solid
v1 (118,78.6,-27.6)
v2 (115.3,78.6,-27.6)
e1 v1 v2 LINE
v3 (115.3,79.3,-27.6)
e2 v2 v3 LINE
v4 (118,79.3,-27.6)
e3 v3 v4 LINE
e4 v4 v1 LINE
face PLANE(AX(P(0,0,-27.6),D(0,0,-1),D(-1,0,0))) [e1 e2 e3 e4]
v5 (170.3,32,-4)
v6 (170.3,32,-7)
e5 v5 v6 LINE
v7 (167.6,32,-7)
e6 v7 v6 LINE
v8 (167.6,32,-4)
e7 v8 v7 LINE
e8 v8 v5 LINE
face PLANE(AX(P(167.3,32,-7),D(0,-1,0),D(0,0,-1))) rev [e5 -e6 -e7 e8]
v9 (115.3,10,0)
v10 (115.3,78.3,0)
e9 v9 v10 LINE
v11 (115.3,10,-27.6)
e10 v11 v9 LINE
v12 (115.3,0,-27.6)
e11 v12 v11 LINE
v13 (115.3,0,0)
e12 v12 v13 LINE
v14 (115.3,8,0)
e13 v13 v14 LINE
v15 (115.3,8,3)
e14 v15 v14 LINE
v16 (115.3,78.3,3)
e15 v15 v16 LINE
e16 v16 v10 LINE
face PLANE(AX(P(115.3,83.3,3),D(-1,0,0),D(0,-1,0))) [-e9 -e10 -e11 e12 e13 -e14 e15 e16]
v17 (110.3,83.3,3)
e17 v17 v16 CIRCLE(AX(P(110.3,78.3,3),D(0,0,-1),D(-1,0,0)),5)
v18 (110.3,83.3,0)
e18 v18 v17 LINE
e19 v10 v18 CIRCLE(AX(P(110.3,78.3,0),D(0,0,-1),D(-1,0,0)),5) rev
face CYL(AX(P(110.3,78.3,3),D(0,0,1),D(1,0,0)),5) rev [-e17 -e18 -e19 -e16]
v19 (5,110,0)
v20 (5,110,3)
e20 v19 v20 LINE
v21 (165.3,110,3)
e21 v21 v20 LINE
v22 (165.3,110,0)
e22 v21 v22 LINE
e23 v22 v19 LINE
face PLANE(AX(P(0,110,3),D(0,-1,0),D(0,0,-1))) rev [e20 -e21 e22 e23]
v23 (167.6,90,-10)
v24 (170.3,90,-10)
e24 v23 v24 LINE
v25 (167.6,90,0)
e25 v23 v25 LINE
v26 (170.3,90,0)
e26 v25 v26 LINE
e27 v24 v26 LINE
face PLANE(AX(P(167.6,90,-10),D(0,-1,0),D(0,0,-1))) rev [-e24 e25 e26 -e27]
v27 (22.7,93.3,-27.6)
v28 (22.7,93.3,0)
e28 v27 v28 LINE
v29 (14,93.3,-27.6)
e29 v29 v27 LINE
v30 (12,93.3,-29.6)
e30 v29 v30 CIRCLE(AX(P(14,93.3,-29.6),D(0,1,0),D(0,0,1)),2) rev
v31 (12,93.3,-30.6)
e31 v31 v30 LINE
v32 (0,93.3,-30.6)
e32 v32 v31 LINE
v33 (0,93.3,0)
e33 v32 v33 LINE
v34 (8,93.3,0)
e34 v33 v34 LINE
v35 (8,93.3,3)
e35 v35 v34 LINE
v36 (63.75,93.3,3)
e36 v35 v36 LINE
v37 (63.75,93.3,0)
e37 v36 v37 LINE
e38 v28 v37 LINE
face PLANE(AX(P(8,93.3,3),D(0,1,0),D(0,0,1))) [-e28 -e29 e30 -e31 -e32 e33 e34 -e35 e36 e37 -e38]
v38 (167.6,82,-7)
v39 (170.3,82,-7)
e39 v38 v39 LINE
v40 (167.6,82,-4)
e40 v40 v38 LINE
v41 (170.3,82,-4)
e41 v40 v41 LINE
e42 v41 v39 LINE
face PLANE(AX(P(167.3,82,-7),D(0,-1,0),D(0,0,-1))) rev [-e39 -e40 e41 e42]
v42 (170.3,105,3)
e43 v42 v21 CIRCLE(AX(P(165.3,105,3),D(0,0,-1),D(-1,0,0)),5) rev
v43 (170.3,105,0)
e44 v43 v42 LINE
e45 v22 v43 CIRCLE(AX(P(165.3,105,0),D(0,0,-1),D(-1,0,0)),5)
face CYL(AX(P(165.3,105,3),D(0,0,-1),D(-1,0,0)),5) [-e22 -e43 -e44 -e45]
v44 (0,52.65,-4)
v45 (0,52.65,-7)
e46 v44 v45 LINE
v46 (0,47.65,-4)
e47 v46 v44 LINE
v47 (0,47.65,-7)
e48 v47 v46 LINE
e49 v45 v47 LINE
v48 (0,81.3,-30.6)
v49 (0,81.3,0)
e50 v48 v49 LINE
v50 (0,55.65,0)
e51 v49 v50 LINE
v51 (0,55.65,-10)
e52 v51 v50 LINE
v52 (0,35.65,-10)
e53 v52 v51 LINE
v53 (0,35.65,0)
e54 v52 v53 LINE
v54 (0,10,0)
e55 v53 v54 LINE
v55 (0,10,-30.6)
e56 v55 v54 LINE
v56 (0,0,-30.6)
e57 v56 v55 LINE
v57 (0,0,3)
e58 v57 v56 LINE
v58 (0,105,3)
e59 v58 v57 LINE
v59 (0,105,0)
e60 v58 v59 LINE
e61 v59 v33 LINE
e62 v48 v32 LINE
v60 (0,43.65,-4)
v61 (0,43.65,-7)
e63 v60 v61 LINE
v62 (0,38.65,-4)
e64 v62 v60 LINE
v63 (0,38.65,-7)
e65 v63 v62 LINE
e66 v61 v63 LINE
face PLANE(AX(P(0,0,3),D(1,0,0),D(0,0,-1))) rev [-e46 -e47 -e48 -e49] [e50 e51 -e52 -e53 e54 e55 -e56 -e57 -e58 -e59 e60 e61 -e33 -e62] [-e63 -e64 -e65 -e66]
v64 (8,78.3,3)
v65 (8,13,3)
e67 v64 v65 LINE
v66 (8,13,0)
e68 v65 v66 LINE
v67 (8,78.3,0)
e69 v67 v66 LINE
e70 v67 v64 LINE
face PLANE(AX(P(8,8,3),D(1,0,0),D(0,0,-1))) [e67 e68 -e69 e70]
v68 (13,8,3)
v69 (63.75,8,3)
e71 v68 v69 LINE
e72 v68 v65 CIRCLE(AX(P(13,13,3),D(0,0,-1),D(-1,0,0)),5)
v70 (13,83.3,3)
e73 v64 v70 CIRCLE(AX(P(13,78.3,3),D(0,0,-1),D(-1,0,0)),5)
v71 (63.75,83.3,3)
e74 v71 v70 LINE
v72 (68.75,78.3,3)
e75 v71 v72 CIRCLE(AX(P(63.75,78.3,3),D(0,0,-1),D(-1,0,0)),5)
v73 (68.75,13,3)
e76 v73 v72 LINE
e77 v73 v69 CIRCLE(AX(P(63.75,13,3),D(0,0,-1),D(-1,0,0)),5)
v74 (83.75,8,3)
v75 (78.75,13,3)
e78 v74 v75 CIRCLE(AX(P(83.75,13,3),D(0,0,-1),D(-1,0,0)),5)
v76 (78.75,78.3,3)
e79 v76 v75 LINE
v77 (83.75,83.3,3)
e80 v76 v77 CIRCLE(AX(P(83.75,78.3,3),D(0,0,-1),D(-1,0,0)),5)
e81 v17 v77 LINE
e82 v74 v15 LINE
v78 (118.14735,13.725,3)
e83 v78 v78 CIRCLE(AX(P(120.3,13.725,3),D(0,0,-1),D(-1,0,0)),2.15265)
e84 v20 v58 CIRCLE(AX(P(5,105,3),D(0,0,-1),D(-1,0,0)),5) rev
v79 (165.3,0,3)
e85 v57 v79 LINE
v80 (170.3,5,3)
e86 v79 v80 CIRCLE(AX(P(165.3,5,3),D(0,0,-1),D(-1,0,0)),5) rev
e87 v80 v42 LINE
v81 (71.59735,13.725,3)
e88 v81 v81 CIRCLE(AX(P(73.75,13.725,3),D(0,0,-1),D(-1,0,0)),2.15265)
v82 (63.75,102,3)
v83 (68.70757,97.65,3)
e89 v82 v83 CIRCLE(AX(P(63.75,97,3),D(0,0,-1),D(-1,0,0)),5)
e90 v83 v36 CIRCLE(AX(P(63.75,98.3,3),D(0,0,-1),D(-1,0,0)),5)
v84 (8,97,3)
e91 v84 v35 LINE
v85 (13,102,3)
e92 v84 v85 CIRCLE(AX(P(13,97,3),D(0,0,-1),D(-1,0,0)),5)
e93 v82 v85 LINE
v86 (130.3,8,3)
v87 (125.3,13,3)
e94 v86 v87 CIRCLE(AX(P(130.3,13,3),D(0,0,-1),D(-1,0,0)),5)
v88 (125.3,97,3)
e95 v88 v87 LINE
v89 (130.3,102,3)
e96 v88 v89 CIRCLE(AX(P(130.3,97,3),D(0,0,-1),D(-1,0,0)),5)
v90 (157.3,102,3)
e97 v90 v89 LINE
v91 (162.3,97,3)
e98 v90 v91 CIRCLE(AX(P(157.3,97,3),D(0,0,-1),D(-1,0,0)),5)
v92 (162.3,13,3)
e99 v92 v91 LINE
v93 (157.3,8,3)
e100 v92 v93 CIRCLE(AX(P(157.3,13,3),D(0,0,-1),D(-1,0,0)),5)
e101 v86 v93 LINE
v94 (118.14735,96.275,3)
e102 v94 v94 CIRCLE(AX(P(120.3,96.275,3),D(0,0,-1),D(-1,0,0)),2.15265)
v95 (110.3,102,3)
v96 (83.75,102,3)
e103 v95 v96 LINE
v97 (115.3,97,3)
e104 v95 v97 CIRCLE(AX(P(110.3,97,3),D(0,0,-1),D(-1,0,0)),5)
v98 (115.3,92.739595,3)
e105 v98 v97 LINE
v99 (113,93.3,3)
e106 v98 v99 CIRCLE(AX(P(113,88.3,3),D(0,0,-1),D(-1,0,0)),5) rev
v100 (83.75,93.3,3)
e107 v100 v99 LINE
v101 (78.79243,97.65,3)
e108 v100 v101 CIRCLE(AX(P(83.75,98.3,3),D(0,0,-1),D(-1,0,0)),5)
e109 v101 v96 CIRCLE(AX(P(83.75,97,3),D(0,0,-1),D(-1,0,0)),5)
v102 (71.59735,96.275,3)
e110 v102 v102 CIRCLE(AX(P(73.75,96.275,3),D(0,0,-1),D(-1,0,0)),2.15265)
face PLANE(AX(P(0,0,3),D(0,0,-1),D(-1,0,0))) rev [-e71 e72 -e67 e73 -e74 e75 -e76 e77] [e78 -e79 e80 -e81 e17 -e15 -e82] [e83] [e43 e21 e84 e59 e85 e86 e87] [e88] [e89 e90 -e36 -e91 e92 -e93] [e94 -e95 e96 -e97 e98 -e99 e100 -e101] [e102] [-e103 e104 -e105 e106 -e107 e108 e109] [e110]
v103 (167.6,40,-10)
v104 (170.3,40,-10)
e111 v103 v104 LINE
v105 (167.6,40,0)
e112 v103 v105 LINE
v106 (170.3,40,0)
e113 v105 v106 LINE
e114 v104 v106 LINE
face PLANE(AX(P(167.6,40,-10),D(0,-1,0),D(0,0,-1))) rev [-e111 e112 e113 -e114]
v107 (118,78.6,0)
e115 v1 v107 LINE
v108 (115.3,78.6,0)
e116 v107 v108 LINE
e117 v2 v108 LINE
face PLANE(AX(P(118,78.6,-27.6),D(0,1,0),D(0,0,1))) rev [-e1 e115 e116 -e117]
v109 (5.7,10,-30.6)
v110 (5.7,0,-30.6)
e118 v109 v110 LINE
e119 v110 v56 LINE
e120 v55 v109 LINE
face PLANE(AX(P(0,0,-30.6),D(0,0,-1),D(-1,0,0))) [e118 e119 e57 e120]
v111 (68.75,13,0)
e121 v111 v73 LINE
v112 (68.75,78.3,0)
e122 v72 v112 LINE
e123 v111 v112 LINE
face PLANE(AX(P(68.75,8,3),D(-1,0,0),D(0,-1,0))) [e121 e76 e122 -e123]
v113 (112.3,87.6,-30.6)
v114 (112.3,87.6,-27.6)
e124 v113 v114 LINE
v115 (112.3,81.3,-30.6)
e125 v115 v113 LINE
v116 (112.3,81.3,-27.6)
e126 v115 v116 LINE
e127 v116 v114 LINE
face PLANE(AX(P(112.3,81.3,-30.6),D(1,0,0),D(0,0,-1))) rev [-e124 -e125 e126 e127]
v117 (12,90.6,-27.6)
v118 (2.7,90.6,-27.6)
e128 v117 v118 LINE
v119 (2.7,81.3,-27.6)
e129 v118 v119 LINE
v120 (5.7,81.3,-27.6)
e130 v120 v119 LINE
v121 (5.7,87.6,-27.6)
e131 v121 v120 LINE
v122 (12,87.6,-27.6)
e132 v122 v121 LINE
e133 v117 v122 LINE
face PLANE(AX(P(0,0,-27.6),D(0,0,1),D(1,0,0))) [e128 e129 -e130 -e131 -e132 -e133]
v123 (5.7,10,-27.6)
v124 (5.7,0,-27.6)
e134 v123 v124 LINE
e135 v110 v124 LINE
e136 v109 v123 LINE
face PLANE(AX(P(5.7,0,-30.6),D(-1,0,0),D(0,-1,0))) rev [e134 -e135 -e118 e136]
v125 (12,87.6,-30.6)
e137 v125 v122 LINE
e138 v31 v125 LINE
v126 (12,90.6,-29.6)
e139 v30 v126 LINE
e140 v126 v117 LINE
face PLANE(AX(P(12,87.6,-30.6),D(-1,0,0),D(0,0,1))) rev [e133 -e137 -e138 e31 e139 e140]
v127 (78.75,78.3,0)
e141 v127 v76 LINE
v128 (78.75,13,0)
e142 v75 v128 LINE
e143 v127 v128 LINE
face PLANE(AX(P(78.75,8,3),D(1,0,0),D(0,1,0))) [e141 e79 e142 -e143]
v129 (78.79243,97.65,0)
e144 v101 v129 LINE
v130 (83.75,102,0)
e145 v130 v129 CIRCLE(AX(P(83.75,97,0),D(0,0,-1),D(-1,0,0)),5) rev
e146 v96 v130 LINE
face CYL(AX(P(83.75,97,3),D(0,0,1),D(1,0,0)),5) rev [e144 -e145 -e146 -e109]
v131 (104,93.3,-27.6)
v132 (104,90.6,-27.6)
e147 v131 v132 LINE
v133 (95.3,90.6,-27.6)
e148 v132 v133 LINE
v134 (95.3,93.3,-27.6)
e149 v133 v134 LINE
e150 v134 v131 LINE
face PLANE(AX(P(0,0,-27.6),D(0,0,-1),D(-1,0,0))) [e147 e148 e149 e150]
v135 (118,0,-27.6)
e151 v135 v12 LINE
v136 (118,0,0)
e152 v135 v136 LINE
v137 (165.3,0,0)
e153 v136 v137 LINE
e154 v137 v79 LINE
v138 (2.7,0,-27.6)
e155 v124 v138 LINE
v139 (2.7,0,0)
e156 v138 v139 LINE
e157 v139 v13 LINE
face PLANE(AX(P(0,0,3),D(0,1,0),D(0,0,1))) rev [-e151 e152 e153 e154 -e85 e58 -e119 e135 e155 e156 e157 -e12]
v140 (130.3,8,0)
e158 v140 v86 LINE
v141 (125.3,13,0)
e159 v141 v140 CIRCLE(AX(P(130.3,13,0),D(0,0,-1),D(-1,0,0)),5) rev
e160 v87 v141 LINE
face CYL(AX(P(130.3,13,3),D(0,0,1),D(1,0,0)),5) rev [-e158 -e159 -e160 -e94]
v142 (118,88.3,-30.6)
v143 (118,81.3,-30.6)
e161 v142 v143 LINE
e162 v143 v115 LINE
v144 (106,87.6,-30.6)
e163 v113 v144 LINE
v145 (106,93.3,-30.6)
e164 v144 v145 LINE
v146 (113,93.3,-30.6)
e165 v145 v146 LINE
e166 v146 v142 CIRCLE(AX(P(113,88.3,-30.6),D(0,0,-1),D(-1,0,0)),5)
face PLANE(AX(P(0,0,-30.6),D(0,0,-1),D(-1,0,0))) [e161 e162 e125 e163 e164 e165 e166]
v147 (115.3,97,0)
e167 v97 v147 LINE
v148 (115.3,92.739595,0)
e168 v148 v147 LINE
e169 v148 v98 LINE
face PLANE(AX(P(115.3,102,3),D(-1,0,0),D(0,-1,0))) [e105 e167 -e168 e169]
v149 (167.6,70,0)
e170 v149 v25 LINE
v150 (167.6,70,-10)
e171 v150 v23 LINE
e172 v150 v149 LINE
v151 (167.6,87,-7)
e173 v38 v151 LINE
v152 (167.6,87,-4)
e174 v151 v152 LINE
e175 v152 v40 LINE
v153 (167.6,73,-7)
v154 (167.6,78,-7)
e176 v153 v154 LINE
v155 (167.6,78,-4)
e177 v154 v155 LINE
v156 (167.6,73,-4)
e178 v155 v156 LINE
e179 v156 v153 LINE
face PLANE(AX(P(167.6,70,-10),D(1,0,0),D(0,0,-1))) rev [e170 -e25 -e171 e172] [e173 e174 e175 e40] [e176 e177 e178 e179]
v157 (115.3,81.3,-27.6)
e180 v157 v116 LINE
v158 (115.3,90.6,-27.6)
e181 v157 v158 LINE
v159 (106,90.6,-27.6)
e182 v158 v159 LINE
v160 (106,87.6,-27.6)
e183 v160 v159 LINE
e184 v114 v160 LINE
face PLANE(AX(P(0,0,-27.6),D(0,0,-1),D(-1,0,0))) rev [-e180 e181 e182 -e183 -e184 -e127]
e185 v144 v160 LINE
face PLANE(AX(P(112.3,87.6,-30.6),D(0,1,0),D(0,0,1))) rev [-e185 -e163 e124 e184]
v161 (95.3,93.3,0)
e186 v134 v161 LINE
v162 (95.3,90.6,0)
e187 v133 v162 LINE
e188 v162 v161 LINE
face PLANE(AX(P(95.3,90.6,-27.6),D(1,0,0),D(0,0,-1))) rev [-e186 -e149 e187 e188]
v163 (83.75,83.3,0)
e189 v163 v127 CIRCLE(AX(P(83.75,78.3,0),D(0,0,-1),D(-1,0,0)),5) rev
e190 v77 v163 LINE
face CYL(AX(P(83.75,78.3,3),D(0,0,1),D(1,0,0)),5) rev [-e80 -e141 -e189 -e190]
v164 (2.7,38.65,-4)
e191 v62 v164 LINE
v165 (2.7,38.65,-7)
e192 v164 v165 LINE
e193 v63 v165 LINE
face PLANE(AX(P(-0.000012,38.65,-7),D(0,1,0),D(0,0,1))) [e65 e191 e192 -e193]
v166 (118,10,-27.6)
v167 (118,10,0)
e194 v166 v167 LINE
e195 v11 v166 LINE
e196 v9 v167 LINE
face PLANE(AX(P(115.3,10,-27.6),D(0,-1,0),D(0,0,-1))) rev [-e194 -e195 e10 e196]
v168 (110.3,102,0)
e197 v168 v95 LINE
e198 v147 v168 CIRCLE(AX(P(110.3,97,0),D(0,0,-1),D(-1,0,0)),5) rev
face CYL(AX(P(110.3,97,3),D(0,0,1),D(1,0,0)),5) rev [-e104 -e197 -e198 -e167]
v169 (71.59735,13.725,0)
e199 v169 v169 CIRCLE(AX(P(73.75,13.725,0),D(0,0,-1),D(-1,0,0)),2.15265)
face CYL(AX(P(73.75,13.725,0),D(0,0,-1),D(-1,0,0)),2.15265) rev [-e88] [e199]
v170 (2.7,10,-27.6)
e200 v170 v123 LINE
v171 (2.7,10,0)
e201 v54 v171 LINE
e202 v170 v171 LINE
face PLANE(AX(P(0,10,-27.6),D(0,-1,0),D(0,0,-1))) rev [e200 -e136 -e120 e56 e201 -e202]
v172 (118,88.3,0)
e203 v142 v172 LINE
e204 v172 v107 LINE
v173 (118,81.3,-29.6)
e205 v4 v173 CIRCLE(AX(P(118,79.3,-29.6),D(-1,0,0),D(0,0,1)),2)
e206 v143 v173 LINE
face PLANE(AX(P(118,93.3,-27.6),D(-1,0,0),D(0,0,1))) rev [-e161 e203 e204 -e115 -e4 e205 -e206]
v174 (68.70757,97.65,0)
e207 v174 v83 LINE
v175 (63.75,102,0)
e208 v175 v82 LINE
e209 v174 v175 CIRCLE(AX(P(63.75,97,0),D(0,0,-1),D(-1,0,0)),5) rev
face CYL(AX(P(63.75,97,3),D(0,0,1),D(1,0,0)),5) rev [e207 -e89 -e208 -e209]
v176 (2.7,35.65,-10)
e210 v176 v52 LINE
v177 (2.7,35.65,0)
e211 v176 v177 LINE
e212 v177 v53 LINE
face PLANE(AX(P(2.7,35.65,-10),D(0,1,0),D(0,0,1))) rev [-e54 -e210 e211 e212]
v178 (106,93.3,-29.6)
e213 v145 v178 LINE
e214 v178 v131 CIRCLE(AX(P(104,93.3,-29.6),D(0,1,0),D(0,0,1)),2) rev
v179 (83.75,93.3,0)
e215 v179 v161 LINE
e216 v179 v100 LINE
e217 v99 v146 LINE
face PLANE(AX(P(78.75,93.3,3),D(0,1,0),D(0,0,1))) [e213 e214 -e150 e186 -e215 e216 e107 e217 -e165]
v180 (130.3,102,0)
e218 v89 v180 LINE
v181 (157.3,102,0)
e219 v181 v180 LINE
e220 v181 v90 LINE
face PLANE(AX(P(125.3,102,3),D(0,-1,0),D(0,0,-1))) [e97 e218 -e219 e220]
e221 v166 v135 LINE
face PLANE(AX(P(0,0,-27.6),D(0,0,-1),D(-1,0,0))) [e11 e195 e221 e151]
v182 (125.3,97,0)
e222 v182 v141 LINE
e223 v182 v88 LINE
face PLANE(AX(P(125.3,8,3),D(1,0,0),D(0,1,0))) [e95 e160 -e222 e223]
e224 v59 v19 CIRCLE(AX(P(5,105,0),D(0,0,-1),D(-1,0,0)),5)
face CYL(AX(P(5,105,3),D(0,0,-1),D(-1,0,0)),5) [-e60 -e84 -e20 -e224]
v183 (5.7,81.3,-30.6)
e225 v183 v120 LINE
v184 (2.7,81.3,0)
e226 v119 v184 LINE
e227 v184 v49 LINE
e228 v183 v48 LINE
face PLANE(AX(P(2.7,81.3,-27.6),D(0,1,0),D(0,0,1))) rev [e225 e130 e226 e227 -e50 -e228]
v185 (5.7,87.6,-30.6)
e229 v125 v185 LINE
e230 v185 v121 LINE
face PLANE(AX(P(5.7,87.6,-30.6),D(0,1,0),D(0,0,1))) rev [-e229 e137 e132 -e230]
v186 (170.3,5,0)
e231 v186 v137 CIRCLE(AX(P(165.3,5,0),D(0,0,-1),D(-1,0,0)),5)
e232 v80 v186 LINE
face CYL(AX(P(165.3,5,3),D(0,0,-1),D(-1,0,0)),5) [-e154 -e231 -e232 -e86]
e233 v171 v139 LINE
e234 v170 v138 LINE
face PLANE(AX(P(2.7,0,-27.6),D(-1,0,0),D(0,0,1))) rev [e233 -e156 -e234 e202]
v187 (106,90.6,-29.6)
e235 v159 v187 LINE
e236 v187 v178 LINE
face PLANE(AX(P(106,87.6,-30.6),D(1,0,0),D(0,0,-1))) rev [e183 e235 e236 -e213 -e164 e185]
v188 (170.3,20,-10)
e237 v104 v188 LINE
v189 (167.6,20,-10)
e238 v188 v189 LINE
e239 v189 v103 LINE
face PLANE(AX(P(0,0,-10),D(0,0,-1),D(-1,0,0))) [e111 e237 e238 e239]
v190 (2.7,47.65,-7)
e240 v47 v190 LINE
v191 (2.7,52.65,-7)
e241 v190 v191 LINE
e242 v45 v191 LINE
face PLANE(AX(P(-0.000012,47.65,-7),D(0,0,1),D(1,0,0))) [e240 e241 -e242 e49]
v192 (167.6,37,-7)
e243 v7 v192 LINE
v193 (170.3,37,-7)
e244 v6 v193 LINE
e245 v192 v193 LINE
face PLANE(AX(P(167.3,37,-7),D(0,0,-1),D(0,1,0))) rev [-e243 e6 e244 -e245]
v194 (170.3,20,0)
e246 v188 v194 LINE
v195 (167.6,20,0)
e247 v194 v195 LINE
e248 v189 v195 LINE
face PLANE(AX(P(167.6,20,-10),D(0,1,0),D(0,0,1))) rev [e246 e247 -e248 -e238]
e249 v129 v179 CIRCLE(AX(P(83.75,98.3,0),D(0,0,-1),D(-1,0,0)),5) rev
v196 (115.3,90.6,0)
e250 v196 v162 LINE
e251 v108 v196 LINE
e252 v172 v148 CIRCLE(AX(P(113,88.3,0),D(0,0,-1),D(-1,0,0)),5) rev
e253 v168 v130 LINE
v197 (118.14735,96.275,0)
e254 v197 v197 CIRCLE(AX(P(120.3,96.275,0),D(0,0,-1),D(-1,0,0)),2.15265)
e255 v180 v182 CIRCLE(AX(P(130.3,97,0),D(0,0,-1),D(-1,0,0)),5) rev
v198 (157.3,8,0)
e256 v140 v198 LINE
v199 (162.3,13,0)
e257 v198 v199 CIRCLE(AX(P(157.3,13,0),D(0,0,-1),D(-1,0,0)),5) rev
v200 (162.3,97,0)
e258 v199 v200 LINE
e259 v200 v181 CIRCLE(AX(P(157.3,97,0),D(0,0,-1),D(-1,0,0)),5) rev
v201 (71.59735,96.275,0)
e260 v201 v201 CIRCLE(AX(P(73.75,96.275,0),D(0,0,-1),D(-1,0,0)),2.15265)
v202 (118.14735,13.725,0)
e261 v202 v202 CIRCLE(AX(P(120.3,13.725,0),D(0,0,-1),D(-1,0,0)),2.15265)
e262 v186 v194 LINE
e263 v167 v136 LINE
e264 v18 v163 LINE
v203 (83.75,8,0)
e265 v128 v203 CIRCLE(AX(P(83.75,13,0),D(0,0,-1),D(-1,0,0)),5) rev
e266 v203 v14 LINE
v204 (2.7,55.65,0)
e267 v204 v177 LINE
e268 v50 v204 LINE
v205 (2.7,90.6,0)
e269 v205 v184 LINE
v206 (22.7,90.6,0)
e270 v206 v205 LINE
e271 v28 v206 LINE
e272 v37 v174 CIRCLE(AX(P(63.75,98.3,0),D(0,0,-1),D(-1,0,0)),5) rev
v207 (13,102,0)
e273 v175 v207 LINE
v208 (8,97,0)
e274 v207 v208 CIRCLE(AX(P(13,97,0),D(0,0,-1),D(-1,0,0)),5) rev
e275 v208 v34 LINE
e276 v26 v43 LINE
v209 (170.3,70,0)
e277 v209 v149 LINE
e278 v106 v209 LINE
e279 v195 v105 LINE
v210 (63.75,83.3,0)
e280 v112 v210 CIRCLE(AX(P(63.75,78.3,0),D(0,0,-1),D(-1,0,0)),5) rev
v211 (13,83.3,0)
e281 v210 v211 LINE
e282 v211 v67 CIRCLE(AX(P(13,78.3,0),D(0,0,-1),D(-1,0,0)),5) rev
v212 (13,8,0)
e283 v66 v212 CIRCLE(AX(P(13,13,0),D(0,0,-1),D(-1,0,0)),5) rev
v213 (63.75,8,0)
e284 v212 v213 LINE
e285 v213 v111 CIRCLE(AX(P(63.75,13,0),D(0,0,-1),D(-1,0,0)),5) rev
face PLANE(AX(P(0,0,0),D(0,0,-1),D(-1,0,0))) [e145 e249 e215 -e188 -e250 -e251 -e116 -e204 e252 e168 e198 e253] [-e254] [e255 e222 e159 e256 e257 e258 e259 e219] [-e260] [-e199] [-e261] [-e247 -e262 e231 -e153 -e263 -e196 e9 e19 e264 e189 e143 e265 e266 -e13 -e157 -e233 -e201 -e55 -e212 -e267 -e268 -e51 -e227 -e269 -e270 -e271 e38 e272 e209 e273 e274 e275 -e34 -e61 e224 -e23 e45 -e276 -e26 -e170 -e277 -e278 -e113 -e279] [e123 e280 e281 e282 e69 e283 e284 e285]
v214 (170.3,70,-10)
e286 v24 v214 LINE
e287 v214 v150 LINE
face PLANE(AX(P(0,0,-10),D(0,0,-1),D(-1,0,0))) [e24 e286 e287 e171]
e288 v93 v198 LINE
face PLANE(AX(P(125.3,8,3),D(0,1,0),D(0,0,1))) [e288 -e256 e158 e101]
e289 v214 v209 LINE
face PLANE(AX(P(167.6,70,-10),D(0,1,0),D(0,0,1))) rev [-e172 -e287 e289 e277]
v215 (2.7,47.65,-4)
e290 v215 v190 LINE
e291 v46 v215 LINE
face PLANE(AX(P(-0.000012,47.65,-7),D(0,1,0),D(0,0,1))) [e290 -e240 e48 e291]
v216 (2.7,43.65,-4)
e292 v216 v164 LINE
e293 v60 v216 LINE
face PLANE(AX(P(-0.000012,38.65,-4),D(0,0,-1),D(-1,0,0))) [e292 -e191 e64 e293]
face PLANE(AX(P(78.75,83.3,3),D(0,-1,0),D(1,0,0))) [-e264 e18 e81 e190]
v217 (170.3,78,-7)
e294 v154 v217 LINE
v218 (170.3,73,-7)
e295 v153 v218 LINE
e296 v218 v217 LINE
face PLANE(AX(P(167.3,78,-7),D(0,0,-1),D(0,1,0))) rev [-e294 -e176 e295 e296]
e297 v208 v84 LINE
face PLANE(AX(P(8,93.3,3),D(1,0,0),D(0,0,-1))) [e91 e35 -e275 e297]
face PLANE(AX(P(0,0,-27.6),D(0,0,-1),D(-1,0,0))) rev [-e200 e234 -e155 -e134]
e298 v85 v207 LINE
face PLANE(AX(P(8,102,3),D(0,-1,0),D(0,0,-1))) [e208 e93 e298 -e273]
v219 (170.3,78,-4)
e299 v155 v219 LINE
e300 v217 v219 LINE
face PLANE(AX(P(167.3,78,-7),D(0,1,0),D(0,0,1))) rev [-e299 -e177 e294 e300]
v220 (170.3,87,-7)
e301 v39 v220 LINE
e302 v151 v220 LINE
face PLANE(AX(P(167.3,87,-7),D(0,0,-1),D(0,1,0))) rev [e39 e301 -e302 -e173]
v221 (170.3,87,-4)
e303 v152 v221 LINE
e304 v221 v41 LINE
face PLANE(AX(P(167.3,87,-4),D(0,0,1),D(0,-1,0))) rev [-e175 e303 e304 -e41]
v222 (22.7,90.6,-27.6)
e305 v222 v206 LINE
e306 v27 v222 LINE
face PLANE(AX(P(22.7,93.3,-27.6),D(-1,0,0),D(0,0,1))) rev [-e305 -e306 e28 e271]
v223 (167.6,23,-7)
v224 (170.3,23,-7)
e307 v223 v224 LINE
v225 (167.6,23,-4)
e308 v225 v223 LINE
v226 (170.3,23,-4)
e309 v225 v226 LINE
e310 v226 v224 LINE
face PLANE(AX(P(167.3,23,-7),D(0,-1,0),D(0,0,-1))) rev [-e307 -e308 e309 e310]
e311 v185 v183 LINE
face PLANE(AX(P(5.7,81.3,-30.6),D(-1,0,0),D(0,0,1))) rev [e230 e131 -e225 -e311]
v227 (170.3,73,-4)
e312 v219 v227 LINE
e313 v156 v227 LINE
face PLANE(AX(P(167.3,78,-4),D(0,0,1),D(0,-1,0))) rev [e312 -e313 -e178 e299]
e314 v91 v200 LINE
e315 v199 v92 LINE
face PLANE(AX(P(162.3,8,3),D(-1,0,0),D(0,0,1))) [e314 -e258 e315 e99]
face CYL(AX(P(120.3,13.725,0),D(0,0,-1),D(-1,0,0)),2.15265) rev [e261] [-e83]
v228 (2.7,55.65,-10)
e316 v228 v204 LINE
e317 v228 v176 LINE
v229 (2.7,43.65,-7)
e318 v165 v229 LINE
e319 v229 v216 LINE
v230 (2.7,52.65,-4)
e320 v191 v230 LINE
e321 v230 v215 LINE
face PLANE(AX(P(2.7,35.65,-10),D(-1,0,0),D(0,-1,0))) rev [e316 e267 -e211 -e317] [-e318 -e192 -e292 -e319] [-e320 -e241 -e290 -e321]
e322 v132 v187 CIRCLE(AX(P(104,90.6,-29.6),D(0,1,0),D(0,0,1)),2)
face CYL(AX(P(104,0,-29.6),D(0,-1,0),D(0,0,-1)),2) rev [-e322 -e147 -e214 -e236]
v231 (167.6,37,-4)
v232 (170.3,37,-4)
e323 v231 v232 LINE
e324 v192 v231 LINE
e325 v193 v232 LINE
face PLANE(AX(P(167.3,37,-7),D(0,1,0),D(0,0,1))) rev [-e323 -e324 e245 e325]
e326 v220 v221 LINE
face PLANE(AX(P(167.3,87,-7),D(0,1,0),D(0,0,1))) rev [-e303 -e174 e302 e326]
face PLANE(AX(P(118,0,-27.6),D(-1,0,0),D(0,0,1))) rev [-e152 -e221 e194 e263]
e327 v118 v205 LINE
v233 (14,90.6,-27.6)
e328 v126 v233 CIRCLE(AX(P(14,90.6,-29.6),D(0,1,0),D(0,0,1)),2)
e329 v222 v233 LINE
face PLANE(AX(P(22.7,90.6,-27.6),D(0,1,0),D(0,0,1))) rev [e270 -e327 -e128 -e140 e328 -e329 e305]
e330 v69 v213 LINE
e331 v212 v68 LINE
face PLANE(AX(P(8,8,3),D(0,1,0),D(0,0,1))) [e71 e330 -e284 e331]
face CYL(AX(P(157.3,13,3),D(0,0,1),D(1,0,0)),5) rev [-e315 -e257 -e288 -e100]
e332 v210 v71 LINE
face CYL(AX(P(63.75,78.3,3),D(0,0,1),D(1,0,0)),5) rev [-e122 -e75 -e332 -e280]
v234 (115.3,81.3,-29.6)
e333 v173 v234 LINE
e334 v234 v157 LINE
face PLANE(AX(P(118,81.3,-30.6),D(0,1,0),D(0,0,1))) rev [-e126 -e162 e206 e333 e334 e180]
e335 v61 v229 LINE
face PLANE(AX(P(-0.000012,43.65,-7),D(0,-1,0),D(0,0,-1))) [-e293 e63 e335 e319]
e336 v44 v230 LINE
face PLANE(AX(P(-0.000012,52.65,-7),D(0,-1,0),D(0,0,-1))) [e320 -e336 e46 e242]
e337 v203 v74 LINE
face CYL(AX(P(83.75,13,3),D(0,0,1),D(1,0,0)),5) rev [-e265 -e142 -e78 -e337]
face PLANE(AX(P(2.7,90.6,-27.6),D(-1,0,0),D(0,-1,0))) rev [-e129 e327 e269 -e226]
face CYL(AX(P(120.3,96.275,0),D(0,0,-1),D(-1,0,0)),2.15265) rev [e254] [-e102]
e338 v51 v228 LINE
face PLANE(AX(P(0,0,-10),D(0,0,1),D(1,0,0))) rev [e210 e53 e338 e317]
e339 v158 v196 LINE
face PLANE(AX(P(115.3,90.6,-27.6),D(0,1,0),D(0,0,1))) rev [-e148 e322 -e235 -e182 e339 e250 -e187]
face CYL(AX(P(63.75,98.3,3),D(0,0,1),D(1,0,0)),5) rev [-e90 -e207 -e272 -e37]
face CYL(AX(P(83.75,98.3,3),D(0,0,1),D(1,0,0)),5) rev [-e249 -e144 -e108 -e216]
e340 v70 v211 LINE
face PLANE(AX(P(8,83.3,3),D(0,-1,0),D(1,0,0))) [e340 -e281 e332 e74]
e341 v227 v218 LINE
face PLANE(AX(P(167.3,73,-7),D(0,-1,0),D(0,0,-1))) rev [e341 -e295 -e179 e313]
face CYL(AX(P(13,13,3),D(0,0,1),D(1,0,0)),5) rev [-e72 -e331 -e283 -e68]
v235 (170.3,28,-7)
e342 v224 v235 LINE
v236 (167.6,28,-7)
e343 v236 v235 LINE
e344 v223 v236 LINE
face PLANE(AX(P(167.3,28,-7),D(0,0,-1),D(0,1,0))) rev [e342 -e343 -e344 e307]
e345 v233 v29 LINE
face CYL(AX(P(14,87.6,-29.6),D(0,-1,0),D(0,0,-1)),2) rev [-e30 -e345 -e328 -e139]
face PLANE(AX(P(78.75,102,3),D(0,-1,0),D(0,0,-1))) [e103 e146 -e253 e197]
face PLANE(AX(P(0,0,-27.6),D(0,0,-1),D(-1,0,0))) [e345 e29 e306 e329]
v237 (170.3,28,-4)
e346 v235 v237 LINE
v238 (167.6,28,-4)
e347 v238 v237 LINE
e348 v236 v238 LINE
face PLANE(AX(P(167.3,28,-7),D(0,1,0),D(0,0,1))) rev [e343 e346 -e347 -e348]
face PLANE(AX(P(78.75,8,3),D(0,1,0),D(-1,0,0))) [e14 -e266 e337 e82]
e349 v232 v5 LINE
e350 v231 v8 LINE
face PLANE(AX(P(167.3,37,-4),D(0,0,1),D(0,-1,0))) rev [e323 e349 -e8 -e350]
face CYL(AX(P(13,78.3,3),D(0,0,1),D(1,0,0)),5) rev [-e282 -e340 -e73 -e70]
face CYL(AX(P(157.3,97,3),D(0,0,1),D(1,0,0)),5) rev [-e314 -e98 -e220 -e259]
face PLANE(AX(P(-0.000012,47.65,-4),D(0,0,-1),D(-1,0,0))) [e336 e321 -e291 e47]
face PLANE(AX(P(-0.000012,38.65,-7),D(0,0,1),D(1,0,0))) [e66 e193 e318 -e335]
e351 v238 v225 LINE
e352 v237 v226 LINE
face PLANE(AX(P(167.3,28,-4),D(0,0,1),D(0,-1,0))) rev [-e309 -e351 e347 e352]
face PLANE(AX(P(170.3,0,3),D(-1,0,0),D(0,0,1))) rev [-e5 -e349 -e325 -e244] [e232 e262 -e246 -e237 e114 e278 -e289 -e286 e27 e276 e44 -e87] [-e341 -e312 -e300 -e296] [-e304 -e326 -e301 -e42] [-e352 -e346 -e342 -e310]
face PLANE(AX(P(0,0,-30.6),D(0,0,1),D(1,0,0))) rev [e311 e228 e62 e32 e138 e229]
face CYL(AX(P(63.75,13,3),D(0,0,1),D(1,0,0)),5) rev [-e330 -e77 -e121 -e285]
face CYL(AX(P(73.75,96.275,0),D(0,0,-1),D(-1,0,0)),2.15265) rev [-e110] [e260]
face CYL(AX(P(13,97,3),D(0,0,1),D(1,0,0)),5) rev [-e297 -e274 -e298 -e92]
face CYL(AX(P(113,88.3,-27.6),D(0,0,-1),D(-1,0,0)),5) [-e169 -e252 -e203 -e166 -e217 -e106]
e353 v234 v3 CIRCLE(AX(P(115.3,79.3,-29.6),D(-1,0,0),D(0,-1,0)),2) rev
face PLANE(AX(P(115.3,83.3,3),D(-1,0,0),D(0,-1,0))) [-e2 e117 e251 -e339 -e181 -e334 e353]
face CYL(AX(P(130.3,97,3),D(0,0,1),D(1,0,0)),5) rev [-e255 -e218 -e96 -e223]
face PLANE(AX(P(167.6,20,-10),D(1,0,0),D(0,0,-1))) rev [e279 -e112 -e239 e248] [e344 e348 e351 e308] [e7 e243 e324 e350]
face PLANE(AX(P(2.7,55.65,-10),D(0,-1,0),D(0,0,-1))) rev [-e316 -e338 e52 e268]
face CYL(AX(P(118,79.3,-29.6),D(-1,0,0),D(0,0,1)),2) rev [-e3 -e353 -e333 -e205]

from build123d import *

# Parameters (mm, degrees)
SKETCH1_W               = 170.3
SKETCH1_H               = 110
SKETCH1_W_2             = 60.75
SKETCH1_H_2             = 75.3
SKETCH1_H_3             = 8.7
SKETCH1_W_3             = 37
SKETCH1_H_4             = 94
SKETCH1_W_4             = 36.55
BOSS_EXTRUDE1_DEPTH     = 3
F_6_CLEARANCE_HOLE1_D   = 4.3053
SKETCH6_W               = 2.7
SKETCH6_H               = 10
BOSS_EXTRUDE2_DEPTH     = 27.6
SKETCH7_W               = 5.7
SKETCH7_H               = 10
BOSS_EXTRUDE3_DEPTH     = 3
FILLET3_R               = 5
FILLET4_R               = 2
FILLET5_R               = 5
SKETCH8_W               = 2.7
SKETCH8_H               = 20
BOSS_EXTRUDE4_DEPTH     = 10
CUT_EXTRUDE1_DEPTH      = 206.032802254
CUT_EXTRUDE1_DEPTH_BACK = 3
SKETCH9_W               = 3
SKETCH9_H               = 5
SKETCH11_W              = 2.7
SKETCH11_H              = 20
BOSS_EXTRUDE5_DEPTH     = 10
SKETCH12_W              = 3
SKETCH12_H              = 5
CUT_EXTRUDE2_DEPTH      = 3


with BuildPart() as part:
    # Sketch1 → Boss-Extrude1 (new body)
    with BuildSketch(Plane.XY):
        with Locations((85.15, 55)):
            Rectangle(SKETCH1_W, SKETCH1_H)
        with Locations((38.375, 45.65)):
            Rectangle(SKETCH1_W_2, SKETCH1_H_2, mode=Mode.SUBTRACT)
        with Locations((38.375, 97.65)):
            Rectangle(SKETCH1_W_2, SKETCH1_H_3, mode=Mode.SUBTRACT)
        with Locations((143.8, 55)):
            Rectangle(SKETCH1_W_3, SKETCH1_H_4, mode=Mode.SUBTRACT)
        with Locations((97.025, 45.65)):
            Rectangle(SKETCH1_W_4, SKETCH1_H_2, mode=Mode.SUBTRACT)
        with Locations((97.025, 97.65)):
            Rectangle(SKETCH1_W_4, SKETCH1_H_3, mode=Mode.SUBTRACT)
    extrude(amount=BOSS_EXTRUDE1_DEPTH)

    # #6 Clearance Hole1 (through all)
    with Locations(Plane(origin=(0, 0, 0), x_dir=(-1, 0, 0), z_dir=(0, 0, -1))):
        with Locations((-120.3, 13.725), (-120.3, 96.275), (-73.75, 13.725), (-73.75, 96.275)):
            Hole(F_6_CLEARANCE_HOLE1_D / 2)

    # Sketch6 → Boss-Extrude2 (add)
    with BuildSketch(Plane(origin=(0, 0, 0), x_dir=(-1, 0, 0), z_dir=(0, 0, -1))):
        with Locations((-1.35, 5)):
            Rectangle(SKETCH6_W, SKETCH6_H)
        with Locations((-116.65, 5)):
            Rectangle(SKETCH6_W, SKETCH6_H)
        Polygon((0, 81.3), (0, 93.3), (-22.7, 93.3), (-22.7, 90.6), (-2.7, 90.6), (-2.7, 81.3), align=None)
        Polygon((-95.3, 93.3), (-118, 93.3), (-118, 78.6), (-115.3, 78.6), (-115.3, 90.6), (-95.3, 90.6), align=None)
    extrude(amount=BOSS_EXTRUDE2_DEPTH)

    # Sketch7 → Boss-Extrude3 (add)
    with BuildSketch(Plane(origin=(0, 0, -27.6), x_dir=(-1, 0, 0), z_dir=(0, 0, -1))):
        Polygon((0, 93.3), (0, 81.3), (-5.7, 81.3), (-5.7, 87.6), (-12, 87.6), (-12, 93.3), align=None)
        with Locations((-2.85, 5)):
            Rectangle(SKETCH7_W, SKETCH7_H)
        Polygon((-118, 93.3), (-118, 81.3), (-112.3, 81.3), (-112.3, 87.6), (-106, 87.6), (-106, 93.3), align=None)
    extrude(amount=BOSS_EXTRUDE3_DEPTH)

    # Fillet3
    fillet3_edges = [part.edges().sort_by_distance(p)[0] for p in [
        (118, 93.3, -15.3),
    ]]
    fillet(fillet3_edges, radius=FILLET3_R)

    # Fillet4
    fillet4_edges = [part.edges().sort_by_distance(p)[0] for p in [
        (12, 91.95, -27.6),
        (106, 91.95, -27.6),
        (116.65, 81.3, -27.6),
    ]]
    fillet(fillet4_edges, radius=FILLET4_R)

    # Fillet5
    # the kernel refuses this fillet: 5 mm, written as the material it adds along each edge
    with BuildSketch(Plane(origin=(8, 83.3, 0), x_dir=(0, -1, 0), z_dir=(0, 0, 1)), Plane(origin=(68.75, 83.3, 0), x_dir=(-1, 0, 0), z_dir=(0, 0, 1)), Plane(origin=(125.3, 102, 0), x_dir=(0, -1, 0), z_dir=(0, 0, 1)), Plane(origin=(125.3, 8, 0), x_dir=(1, 0, 0), z_dir=(0, 0, 1)), Plane(origin=(68.75, 93.3, 0), x_dir=(0, 1, 0), z_dir=(0, 0, 1)), Plane(origin=(68.75, 102, 0), x_dir=(-1, 0, 0), z_dir=(0, 0, 1)), Plane(origin=(78.75, 8, 0), x_dir=(1, 0, 0), z_dir=(0, 0, 1)), Plane(origin=(78.75, 102, 0), x_dir=(0, -1, 0), z_dir=(0, 0, 1)), Plane(origin=(78.75, 93.3, 0), x_dir=(1, 0, 0), z_dir=(0, 0, 1))) as fillet5_piece_1:
        with BuildLine():
            CenterArc((FILLET5_R, FILLET5_R), FILLET5_R, 180, 90)
            Line((0, FILLET5_R), (0, 0))
            Line((0, 0), (FILLET5_R, 0))
        make_face()
    extrude(amount=3)
    with BuildSketch(Plane(origin=(8, 8, 0), x_dir=(0, 1, 0), z_dir=(0, 0, 1)), Plane(origin=(68.75, 8, 0), x_dir=(-1, 0, 0), z_dir=(0, 0, 1)), Plane(origin=(162.3, 102, 0), x_dir=(0, -1, 0), z_dir=(0, 0, 1)), Plane(origin=(162.3, 8, 0), x_dir=(-1, 0, 0), z_dir=(0, 0, 1)), Plane(origin=(8, 102, 0), x_dir=(1, 0, 0), z_dir=(0, 0, 1)), Plane(origin=(115.3, 83.3, 0), x_dir=(0, -1, 0), z_dir=(0, 0, 1)), Plane(origin=(78.75, 83.3, 0), x_dir=(1, 0, 0), z_dir=(0, 0, 1)), Plane(origin=(115.3, 102, 0), x_dir=(0, -1, 0), z_dir=(0, 0, 1))) as fillet5_piece_2:
        with BuildLine():
            CenterArc((FILLET5_R, -FILLET5_R), FILLET5_R, 90, 90)
            Line((0, -FILLET5_R), (0, 0))
            Line((0, 0), (FILLET5_R, 0))
        make_face()
    extrude(amount=3)
    # the kernel refuses this fillet: 5 mm, written as the material it takes off along each edge
    with BuildSketch(Plane(origin=(0, 110, -12.5), x_dir=(0, -1, 0), z_dir=(0, 0, 1)), Plane(origin=(170.3, 110, -12.5), x_dir=(-1, 0, 0), z_dir=(0, 0, 1)), Plane(origin=(170.3, 0, -12.5), x_dir=(0, 1, 0), z_dir=(0, 0, 1))) as fillet5_2_piece_1:
        with BuildLine():
            CenterArc((FILLET5_R, FILLET5_R), FILLET5_R, 180, 90)
            Line((0, FILLET5_R), (0, 0))
            Line((0, 0), (FILLET5_R, 0))
        make_face()
    extrude(amount=28, mode=Mode.SUBTRACT)

    # Sketch8 → Boss-Extrude4 (add)
    with BuildSketch(Plane(origin=(0, 0, 0), x_dir=(-1, 0, 0), z_dir=(0, 0, -1))):
        with Locations((-1.35, 45.65)):
            Rectangle(SKETCH8_W, SKETCH8_H)
    extrude(amount=BOSS_EXTRUDE4_DEPTH)

    # Sketch9 → Cut-Extrude1 (cut, two sides: drawn at the far end of the back side and taken through both)
    with BuildSketch(Plane.ZY.offset(-CUT_EXTRUDE1_DEPTH_BACK)):
        with Locations((-5.5, 41.15)):
            Rectangle(SKETCH9_W, SKETCH9_H)
        with Locations((-5.5, 50.15)):
            Rectangle(SKETCH9_W, SKETCH9_H)
    extrude(amount=CUT_EXTRUDE1_DEPTH + CUT_EXTRUDE1_DEPTH_BACK, mode=Mode.SUBTRACT)

    # Sketch11 → Boss-Extrude5 (add)
    with BuildSketch(Plane(origin=(0, 0, 0), x_dir=(-1, 0, 0), z_dir=(0, 0, -1))):
        with Locations((-168.95, 30)):
            Rectangle(SKETCH11_W, SKETCH11_H)
        with Locations((-168.95, 80)):
            Rectangle(SKETCH11_W, SKETCH11_H)
    extrude(amount=BOSS_EXTRUDE5_DEPTH)

    # Sketch12 → Cut-Extrude2 (cut)
    with BuildSketch(Plane(origin=(170.3, 0, 0), x_dir=(0, 0, -1), z_dir=(1, 0, 0))):
        with Locations((5.5, 34.5)):
            Rectangle(SKETCH12_W, SKETCH12_H)
        with Locations((5.5, 25.5)):
            Rectangle(SKETCH12_W, SKETCH12_H)
        with Locations((5.5, 84.5)):
            Rectangle(SKETCH12_W, SKETCH12_H)
        with Locations((5.5, 75.5)):
            Rectangle(SKETCH12_W, SKETCH12_H)
    extrude(amount=-CUT_EXTRUDE2_DEPTH, mode=Mode.SUBTRACT)


solid = part.part
